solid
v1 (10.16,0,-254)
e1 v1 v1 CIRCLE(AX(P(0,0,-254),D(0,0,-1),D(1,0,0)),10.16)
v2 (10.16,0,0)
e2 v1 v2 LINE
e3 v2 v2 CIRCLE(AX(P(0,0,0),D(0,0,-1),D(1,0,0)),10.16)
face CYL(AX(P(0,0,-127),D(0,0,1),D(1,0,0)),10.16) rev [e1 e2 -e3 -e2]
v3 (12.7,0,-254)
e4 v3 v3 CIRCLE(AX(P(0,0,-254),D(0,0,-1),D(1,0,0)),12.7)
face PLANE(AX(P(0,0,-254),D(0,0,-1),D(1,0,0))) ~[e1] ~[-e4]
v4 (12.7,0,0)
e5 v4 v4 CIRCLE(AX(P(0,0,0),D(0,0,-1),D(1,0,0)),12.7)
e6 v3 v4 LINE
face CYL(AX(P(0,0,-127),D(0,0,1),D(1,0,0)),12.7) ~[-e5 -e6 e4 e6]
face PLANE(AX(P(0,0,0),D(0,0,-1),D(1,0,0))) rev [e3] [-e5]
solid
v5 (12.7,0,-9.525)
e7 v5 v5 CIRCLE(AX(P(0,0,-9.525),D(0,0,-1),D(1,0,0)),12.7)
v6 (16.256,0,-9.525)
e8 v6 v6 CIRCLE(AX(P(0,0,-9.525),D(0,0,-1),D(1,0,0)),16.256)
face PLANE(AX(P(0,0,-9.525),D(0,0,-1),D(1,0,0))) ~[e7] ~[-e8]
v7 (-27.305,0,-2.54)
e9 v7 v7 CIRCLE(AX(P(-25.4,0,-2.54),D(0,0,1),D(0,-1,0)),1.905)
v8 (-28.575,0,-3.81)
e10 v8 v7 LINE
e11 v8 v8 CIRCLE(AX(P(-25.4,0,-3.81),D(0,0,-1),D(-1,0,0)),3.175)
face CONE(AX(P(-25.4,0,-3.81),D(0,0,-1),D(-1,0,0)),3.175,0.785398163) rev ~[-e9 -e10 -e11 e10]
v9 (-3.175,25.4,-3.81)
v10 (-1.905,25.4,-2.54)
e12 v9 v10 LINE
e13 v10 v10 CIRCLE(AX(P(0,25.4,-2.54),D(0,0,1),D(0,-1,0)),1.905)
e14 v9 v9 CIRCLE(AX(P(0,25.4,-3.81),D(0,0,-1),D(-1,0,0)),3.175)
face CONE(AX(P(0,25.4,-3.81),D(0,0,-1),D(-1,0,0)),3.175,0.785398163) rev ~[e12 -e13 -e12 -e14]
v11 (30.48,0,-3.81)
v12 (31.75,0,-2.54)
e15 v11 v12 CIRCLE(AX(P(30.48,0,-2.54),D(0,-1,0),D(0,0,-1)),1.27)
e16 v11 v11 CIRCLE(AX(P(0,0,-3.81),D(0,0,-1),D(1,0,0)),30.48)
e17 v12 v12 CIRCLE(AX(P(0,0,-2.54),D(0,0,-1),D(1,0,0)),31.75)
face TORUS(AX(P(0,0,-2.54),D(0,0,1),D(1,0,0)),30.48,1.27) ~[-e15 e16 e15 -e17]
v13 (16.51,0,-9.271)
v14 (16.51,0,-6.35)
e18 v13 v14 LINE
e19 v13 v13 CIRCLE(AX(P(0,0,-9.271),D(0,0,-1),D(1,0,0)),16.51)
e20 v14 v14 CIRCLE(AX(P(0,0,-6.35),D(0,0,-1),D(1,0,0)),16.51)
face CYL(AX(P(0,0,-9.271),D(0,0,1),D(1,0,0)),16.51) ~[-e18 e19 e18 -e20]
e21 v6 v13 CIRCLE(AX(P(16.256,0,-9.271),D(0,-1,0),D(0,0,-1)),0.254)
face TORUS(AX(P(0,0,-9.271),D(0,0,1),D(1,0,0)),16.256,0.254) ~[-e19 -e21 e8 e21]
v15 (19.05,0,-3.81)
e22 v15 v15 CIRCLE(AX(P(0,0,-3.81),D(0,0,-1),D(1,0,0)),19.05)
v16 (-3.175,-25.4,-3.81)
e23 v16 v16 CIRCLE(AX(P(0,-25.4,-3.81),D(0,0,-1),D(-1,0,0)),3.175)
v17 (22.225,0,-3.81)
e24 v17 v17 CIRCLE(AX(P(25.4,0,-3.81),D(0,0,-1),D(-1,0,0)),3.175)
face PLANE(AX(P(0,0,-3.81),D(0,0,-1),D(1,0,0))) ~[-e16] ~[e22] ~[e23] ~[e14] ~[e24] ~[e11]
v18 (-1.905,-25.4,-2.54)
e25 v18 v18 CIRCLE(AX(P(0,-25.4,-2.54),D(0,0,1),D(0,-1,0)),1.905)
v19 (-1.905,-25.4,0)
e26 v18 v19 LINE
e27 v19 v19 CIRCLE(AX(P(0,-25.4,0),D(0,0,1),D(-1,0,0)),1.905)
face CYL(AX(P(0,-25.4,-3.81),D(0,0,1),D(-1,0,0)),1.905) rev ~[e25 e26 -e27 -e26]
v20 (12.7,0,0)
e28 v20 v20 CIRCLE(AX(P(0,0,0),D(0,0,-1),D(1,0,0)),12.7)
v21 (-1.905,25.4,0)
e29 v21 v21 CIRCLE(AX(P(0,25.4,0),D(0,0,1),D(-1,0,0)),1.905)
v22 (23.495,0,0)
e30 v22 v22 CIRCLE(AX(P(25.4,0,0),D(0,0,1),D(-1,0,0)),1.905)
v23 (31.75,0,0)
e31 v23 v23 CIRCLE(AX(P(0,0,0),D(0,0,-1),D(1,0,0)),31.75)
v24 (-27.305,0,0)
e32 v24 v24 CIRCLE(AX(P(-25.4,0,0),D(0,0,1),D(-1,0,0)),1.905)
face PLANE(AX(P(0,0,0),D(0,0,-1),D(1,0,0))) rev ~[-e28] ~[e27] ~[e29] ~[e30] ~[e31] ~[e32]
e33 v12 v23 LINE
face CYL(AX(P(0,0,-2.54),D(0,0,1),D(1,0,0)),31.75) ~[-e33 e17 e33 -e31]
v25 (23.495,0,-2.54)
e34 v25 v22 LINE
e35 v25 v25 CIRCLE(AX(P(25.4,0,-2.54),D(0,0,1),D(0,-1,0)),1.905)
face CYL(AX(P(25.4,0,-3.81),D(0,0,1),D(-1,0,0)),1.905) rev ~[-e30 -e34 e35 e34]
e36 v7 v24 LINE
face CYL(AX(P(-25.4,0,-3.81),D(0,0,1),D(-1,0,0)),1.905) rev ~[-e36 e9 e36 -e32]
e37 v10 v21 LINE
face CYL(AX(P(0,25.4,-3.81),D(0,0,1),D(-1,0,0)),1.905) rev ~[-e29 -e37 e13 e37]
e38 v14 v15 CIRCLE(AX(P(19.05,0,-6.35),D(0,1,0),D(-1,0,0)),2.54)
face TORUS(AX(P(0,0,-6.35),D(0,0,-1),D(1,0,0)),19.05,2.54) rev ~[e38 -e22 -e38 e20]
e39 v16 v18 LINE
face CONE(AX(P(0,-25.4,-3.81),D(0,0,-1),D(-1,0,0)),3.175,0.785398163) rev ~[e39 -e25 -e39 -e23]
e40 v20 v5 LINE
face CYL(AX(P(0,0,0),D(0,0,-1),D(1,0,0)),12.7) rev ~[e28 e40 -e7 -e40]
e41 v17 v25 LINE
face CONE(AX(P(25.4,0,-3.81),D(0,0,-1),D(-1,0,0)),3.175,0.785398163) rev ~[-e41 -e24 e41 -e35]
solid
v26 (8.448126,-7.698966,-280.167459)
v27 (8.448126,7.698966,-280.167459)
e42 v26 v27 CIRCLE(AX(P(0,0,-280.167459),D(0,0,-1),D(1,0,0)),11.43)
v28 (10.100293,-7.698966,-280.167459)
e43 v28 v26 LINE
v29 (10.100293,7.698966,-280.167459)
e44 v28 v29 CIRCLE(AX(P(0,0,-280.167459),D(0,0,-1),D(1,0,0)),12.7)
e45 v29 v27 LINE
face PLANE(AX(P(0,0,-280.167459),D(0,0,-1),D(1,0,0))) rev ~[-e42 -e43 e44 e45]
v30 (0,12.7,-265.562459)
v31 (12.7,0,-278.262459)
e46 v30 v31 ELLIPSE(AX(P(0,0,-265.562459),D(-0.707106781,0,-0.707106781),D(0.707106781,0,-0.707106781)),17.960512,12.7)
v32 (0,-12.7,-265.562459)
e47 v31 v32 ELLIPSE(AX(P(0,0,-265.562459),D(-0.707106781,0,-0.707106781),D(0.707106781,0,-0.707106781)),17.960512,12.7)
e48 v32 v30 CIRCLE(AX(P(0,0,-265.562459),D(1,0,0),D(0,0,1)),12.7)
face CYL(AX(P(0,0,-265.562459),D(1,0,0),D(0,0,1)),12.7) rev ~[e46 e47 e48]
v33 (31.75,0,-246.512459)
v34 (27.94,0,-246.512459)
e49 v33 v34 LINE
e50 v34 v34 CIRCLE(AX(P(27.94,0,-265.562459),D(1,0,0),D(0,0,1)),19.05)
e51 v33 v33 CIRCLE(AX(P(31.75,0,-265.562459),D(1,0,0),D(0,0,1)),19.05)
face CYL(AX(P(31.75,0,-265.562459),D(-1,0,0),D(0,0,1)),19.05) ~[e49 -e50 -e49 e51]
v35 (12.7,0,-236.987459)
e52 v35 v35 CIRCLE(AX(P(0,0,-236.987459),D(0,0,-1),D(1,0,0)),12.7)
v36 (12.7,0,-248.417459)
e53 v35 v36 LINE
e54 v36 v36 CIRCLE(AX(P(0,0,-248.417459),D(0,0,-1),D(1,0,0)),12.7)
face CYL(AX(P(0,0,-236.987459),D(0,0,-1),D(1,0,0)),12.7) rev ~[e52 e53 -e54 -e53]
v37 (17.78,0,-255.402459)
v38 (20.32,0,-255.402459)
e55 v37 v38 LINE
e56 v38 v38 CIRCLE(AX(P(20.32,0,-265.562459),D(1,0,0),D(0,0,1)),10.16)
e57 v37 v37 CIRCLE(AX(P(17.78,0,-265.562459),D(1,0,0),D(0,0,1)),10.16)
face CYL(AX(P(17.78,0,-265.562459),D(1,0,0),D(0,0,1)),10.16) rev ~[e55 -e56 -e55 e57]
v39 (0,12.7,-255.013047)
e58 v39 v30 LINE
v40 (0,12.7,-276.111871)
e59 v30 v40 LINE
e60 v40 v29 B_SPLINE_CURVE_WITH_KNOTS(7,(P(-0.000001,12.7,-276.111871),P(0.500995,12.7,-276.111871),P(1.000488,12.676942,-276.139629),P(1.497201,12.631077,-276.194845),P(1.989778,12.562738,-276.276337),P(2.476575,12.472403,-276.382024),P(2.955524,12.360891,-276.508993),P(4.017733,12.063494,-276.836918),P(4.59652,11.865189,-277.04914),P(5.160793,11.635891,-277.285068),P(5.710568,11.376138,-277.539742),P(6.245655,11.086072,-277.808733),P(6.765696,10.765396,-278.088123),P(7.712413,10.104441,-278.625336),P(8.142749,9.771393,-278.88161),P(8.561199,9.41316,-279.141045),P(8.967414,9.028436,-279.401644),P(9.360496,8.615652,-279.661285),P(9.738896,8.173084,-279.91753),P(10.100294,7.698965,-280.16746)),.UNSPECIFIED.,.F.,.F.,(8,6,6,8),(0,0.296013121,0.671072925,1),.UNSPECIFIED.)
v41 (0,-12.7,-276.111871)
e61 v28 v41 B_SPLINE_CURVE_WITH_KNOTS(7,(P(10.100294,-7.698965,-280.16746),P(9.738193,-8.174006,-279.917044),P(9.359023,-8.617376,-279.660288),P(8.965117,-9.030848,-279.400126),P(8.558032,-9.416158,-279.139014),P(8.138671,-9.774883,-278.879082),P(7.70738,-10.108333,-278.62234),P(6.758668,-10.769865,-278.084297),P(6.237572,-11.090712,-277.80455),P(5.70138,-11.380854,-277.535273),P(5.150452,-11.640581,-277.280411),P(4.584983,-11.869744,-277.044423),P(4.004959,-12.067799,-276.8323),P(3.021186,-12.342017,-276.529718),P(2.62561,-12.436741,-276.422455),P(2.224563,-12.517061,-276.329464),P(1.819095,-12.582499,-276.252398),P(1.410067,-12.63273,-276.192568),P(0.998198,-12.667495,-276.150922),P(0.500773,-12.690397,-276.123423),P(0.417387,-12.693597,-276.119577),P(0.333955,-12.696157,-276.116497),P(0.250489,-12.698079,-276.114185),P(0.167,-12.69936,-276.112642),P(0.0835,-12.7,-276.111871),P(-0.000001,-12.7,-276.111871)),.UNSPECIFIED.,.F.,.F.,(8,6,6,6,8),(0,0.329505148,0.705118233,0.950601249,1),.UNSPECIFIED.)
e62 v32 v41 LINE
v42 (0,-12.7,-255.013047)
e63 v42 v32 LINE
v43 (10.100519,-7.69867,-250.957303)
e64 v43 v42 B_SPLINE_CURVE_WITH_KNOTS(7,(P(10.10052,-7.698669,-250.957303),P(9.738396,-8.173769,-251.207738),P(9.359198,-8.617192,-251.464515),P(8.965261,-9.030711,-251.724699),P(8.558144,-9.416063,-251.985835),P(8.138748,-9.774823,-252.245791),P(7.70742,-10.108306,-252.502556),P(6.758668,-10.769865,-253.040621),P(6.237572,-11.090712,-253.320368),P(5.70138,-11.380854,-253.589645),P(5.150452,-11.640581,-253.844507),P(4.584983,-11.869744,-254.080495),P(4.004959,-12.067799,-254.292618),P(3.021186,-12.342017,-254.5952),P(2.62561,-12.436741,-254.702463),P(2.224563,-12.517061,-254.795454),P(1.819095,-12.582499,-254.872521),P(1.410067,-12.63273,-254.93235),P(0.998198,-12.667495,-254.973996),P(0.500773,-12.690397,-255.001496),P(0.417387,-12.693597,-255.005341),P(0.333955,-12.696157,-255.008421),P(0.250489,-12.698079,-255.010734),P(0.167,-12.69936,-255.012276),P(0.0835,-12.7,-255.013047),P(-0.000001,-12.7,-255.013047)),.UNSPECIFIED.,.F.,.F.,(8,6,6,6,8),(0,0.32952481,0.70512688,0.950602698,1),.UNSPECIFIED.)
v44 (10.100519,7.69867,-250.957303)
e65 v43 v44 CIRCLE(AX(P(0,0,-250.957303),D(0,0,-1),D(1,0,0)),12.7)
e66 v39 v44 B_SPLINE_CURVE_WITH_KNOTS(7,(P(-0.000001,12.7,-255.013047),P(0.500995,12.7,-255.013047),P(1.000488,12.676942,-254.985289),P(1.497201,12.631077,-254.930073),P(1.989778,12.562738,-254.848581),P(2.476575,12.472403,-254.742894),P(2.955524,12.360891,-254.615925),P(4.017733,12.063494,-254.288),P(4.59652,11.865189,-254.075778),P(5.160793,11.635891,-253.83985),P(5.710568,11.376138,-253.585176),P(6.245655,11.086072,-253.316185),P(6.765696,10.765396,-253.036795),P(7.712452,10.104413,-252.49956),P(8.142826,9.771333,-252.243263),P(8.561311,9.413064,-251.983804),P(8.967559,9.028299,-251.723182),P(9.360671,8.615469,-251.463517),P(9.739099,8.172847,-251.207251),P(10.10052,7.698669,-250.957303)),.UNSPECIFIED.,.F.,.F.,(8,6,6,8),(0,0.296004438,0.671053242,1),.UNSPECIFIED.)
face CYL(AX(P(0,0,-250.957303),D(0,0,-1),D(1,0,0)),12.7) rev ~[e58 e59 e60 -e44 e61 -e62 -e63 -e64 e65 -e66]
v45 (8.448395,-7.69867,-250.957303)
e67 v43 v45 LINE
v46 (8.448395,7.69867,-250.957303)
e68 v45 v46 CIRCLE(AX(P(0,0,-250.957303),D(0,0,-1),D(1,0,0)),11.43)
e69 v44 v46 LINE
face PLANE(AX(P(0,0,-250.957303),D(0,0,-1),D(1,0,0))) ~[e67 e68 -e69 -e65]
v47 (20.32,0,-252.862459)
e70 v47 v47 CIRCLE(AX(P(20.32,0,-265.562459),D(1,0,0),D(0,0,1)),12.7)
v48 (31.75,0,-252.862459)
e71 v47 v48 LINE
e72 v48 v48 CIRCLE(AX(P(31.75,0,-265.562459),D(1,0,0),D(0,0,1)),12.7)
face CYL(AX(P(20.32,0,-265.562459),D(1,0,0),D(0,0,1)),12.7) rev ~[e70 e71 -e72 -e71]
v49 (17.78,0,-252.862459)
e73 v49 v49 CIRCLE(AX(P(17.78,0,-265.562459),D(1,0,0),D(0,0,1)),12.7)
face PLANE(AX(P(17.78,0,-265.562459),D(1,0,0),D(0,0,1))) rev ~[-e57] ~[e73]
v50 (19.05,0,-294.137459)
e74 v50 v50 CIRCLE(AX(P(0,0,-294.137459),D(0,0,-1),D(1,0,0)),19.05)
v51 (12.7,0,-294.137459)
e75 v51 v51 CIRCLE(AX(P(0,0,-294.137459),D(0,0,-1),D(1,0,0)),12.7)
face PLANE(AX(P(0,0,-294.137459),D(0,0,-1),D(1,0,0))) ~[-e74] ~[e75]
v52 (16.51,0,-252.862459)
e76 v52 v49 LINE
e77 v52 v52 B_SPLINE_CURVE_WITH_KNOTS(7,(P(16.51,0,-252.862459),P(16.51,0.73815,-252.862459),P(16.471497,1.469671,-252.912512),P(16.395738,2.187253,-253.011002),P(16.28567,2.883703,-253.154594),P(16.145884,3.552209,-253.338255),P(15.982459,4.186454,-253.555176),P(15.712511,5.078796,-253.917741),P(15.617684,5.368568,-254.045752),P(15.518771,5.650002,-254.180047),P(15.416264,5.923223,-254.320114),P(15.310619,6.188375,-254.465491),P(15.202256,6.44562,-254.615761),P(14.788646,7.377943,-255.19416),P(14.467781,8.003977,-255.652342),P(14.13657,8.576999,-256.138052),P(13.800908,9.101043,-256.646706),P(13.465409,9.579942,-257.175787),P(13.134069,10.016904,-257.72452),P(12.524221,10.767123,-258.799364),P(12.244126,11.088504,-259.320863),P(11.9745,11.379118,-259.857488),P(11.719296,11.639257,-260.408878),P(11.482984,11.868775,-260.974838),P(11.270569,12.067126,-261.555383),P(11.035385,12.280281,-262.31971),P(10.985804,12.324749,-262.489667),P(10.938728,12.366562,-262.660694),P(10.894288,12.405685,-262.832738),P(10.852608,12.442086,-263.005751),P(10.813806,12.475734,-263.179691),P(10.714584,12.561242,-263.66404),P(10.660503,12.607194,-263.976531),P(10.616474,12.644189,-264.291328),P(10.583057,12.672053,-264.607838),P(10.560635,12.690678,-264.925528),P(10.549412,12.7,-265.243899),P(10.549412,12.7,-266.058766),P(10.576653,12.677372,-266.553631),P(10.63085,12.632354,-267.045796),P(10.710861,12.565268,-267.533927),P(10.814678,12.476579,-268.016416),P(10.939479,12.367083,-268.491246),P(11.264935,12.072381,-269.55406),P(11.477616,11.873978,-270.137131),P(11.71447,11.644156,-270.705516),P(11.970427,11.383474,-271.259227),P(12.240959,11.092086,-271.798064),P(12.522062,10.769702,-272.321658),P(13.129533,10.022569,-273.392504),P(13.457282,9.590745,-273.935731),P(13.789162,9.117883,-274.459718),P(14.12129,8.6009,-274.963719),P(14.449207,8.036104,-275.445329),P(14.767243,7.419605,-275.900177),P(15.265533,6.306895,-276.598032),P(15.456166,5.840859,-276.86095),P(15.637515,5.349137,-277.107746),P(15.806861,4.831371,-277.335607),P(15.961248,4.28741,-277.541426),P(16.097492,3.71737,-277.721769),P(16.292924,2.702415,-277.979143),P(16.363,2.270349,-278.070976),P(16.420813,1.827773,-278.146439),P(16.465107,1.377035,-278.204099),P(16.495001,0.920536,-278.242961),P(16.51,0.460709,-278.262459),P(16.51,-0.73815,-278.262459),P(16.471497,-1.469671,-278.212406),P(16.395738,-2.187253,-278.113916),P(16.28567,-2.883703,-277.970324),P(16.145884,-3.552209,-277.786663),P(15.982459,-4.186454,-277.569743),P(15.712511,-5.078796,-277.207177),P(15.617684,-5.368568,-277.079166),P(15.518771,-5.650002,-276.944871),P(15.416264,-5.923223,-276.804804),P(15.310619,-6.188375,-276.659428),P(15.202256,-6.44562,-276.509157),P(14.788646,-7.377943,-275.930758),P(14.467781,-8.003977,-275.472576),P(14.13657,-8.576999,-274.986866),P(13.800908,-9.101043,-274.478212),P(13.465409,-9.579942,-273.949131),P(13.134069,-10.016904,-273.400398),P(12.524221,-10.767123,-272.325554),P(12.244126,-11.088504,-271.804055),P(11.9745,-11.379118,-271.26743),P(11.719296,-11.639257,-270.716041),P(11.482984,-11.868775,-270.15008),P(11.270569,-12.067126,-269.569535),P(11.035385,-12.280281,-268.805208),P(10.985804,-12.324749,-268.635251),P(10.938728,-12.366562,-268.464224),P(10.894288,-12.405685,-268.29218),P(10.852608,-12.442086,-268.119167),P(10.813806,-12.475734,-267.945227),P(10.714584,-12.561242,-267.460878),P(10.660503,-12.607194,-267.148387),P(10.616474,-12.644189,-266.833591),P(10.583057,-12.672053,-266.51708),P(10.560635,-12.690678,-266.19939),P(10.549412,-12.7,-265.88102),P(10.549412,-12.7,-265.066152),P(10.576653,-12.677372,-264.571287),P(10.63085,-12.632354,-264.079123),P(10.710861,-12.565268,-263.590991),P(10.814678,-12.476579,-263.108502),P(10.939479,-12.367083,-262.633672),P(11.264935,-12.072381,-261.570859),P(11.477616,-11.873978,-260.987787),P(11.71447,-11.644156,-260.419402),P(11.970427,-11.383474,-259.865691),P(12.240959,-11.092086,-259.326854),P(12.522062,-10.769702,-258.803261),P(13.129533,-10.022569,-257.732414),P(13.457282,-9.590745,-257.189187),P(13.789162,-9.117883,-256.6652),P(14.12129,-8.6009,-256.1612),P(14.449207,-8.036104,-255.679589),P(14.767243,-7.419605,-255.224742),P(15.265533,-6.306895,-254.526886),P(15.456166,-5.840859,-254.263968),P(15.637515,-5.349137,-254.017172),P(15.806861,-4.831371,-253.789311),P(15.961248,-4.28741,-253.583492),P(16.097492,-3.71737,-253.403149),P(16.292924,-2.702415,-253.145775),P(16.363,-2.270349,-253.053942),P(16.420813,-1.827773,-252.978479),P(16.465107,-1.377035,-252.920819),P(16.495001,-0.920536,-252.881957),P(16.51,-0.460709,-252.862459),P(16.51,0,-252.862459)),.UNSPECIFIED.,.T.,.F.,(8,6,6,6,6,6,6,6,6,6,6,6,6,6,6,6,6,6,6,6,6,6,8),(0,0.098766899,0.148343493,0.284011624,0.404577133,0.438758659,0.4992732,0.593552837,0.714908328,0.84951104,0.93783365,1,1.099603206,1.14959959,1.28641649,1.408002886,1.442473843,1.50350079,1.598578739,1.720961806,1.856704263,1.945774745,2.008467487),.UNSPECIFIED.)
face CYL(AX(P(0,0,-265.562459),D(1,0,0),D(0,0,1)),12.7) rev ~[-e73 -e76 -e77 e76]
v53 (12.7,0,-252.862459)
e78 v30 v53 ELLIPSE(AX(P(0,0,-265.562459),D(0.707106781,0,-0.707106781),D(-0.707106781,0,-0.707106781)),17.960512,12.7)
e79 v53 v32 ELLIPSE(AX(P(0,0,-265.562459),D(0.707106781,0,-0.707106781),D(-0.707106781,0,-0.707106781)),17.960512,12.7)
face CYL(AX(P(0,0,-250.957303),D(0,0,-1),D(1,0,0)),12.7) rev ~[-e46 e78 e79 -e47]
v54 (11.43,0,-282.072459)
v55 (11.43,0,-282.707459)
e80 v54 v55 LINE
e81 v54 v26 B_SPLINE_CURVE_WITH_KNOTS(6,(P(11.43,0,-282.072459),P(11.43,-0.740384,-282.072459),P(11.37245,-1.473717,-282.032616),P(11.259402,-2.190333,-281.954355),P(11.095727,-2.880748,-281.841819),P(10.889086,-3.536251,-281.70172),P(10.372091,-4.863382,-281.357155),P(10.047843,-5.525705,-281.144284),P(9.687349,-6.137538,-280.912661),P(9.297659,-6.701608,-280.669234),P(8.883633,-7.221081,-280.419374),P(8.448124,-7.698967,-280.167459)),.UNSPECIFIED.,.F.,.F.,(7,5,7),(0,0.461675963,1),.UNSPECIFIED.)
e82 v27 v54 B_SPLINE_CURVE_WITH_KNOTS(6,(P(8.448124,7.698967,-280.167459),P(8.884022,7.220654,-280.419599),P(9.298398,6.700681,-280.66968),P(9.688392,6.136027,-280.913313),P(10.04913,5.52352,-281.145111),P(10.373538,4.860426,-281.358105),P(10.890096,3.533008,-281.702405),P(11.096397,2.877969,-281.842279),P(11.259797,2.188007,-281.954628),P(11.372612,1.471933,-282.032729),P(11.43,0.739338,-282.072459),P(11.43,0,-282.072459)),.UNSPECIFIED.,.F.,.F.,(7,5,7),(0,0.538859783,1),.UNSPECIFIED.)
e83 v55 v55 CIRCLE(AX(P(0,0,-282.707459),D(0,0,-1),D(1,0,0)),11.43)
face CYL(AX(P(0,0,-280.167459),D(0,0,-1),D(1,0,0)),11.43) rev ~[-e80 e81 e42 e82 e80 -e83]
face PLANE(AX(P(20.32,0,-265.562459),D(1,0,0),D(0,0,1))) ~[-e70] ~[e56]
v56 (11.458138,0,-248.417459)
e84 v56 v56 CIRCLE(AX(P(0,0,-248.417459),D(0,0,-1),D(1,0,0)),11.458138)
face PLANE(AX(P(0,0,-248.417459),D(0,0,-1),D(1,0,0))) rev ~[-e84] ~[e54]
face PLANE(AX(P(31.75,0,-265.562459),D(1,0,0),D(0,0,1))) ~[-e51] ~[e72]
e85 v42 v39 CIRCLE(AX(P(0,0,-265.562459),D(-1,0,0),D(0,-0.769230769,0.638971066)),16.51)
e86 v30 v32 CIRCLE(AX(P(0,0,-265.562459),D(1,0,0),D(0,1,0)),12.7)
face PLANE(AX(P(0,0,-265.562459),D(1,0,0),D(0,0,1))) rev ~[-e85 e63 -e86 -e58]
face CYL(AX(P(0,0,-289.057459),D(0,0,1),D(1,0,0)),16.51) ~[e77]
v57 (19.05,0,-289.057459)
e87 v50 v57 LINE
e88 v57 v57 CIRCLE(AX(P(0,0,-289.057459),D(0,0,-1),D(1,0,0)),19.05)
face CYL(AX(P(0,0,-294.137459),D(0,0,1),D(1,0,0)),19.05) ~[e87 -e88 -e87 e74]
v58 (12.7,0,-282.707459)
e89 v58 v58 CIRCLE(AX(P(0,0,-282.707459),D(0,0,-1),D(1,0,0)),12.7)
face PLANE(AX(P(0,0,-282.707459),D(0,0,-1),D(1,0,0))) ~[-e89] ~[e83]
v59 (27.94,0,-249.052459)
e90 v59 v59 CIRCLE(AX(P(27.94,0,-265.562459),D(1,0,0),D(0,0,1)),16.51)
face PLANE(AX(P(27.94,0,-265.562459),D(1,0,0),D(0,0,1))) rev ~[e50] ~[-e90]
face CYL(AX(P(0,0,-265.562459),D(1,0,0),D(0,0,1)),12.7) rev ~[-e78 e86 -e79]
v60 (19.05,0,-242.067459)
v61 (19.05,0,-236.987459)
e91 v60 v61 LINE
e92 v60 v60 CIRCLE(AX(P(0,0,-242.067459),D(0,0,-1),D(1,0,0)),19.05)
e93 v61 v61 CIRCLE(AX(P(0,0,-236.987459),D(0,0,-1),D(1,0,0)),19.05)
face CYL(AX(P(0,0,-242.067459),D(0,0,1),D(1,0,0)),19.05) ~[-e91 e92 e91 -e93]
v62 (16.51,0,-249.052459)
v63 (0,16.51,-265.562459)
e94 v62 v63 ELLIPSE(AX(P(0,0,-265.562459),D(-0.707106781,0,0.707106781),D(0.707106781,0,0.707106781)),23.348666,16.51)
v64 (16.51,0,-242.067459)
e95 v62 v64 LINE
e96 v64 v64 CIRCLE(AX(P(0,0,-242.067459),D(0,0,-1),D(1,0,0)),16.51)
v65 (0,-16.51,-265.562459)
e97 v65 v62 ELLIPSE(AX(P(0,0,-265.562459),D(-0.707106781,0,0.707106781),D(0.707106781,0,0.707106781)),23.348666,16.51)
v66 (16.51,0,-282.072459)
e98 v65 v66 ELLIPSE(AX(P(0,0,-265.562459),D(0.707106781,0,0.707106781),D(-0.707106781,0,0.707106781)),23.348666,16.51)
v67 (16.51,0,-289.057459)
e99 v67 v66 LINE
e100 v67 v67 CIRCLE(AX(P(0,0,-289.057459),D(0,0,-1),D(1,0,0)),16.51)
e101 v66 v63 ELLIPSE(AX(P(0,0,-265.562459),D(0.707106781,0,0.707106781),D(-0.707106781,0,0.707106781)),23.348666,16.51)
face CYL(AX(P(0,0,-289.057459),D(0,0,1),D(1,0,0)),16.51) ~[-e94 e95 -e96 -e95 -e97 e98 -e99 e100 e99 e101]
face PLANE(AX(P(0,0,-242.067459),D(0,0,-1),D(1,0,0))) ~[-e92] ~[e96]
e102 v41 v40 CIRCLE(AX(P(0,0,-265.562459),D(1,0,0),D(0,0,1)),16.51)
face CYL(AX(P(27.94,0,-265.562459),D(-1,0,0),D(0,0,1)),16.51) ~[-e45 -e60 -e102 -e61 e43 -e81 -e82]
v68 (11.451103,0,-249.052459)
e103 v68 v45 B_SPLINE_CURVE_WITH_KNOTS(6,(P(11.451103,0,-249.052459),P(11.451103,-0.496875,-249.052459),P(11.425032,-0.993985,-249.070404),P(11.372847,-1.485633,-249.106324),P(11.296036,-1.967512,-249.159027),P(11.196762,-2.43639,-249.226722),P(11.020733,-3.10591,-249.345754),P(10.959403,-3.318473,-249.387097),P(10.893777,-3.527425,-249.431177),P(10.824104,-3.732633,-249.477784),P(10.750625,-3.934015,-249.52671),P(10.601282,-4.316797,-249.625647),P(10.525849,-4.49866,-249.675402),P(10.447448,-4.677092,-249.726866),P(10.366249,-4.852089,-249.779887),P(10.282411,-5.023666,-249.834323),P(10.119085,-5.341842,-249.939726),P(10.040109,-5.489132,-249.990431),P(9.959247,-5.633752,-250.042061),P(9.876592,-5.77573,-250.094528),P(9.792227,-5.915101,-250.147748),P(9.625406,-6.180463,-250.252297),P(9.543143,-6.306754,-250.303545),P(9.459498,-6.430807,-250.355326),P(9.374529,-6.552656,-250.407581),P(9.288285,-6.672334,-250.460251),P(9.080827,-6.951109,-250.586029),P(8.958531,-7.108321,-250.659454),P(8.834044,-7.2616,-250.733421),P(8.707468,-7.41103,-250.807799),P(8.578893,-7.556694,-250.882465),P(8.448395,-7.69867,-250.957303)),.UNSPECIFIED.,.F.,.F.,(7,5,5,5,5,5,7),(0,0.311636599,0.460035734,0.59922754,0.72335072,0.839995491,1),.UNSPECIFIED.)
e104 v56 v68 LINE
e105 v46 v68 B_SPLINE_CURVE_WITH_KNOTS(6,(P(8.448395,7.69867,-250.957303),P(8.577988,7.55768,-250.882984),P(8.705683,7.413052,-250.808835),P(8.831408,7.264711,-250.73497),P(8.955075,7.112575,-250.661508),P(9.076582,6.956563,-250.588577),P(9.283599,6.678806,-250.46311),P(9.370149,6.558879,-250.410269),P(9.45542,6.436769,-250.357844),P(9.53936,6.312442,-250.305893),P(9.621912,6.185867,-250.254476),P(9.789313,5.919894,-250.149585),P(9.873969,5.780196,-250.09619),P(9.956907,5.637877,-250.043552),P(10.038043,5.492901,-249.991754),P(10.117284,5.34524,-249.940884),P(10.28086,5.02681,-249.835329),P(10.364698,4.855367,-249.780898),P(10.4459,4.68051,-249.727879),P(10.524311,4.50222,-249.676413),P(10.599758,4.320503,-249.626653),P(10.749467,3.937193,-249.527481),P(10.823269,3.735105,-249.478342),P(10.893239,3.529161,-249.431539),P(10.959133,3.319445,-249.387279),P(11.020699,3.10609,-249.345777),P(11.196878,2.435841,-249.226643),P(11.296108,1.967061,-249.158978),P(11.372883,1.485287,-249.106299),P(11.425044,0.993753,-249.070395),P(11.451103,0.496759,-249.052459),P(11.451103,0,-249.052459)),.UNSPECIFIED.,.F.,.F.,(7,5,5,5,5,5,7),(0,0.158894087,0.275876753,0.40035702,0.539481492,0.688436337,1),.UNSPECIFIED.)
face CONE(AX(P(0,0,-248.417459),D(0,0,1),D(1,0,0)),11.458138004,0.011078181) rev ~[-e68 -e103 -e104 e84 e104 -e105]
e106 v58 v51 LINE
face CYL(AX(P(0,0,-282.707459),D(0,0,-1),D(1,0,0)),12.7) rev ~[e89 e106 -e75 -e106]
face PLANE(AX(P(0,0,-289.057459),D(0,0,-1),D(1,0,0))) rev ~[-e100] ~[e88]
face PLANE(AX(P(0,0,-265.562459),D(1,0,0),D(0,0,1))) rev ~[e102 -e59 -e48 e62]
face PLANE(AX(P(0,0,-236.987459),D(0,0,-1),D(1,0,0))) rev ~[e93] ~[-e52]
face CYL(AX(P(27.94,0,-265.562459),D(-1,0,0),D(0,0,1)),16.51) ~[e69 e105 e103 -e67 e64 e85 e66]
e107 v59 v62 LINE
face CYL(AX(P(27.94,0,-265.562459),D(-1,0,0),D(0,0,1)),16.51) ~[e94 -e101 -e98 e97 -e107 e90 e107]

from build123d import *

# Parameters (mm, degrees)
F0_W           = 2.54
F0_H           = 254
F9_D           = 3.81
F9_CSINK_D     = 6.35
F9_CSINK_ANGLE = 90


with BuildPart() as f1:
    # F0 (on Front) → F1 (revolve)
    with BuildSketch(Plane.XZ):
        with Locations((11.43, -127)):
            Rectangle(F0_W, F0_H)
    revolve(axis=Axis((0, 0, -67.6468755098), (0, 0, -1)))


with BuildPart() as f3:
    # F2 (on Front) → F3 (revolve)
    with BuildSketch(Plane.XZ):
        with BuildLine():
            Line((12.7, 0), (12.7, -9.525))
            Line((12.7, -9.525), (16.256, -9.525))
            ThreePointArc((16.256, -9.525), (16.4356051224, -9.4506051224), (16.51, -9.271))
            Line((16.51, -9.271), (16.51, -6.35))
            ThreePointArc((16.51, -6.35), (17.2539487758, -4.5539487758), (19.05, -3.81))
            Line((19.05, -3.81), (30.48, -3.81))
            ThreePointArc((30.48, -3.81), (31.3780256121, -3.4380256121), (31.75, -2.54))
            Line((31.75, -2.54), (31.75, 0))
            Line((31.75, 0), (12.7, 0))
        make_face()
    revolve(axis=Axis((0, 0, -110.5323322117), (0, 0, -1)))

    # F9 (through all)
    with Locations(Plane(origin=(0, 0, -3.81), x_dir=(1, 0, 0), z_dir=(0, 0, -1))):
        with Locations((25.4, 0), (0, 25.4), (-25.4, 0), (0, -25.4)):
            CounterSinkHole(F9_D / 2, F9_CSINK_D / 2, counter_sink_angle=F9_CSINK_ANGLE)


with BuildPart() as f5:
    # F4 (on Front) → F5 (revolve)
    with BuildSketch(Plane.XZ):
        Polygon((19.05, -236.9874591094), (12.7, -236.9874591094), (12.7, -248.4174591094), (11.4581380039, -248.4174591094), (11.43, -250.9573032489), (12.7, -250.9573032489), (12.7, -280.1674591094), (11.43, -280.1674591094), (11.43, -282.7074591094), (12.7, -282.7074591094), (12.7, -294.1374591094), (19.05, -294.1374591094), (19.05, -289.0574591094), (16.51, -289.0574591094), (16.51, -242.0674591094), (19.05, -242.0674591094), align=None)
    revolve(axis=Axis((0, 0, -105.1599124395), (0, 0, -1)))

    # F6 (on Front) → F7 (revolve)
    with BuildSketch(Plane.XZ):
        Polygon((0, -249.0524591094), (0, -252.8624591094), (17.78, -252.8624591094), (17.78, -255.4024591094), (20.32, -255.4024591094), (20.32, -252.8624591094), (31.75, -252.8624591094), (31.75, -246.5124591094), (27.94, -246.5124591094), (27.94, -249.0524591094), align=None)
    revolve(axis=Axis((24.5970338583, 0, -265.5624591094), (1, 0, 0)))


solid = Compound([f1.part, f3.part, f5.part])
